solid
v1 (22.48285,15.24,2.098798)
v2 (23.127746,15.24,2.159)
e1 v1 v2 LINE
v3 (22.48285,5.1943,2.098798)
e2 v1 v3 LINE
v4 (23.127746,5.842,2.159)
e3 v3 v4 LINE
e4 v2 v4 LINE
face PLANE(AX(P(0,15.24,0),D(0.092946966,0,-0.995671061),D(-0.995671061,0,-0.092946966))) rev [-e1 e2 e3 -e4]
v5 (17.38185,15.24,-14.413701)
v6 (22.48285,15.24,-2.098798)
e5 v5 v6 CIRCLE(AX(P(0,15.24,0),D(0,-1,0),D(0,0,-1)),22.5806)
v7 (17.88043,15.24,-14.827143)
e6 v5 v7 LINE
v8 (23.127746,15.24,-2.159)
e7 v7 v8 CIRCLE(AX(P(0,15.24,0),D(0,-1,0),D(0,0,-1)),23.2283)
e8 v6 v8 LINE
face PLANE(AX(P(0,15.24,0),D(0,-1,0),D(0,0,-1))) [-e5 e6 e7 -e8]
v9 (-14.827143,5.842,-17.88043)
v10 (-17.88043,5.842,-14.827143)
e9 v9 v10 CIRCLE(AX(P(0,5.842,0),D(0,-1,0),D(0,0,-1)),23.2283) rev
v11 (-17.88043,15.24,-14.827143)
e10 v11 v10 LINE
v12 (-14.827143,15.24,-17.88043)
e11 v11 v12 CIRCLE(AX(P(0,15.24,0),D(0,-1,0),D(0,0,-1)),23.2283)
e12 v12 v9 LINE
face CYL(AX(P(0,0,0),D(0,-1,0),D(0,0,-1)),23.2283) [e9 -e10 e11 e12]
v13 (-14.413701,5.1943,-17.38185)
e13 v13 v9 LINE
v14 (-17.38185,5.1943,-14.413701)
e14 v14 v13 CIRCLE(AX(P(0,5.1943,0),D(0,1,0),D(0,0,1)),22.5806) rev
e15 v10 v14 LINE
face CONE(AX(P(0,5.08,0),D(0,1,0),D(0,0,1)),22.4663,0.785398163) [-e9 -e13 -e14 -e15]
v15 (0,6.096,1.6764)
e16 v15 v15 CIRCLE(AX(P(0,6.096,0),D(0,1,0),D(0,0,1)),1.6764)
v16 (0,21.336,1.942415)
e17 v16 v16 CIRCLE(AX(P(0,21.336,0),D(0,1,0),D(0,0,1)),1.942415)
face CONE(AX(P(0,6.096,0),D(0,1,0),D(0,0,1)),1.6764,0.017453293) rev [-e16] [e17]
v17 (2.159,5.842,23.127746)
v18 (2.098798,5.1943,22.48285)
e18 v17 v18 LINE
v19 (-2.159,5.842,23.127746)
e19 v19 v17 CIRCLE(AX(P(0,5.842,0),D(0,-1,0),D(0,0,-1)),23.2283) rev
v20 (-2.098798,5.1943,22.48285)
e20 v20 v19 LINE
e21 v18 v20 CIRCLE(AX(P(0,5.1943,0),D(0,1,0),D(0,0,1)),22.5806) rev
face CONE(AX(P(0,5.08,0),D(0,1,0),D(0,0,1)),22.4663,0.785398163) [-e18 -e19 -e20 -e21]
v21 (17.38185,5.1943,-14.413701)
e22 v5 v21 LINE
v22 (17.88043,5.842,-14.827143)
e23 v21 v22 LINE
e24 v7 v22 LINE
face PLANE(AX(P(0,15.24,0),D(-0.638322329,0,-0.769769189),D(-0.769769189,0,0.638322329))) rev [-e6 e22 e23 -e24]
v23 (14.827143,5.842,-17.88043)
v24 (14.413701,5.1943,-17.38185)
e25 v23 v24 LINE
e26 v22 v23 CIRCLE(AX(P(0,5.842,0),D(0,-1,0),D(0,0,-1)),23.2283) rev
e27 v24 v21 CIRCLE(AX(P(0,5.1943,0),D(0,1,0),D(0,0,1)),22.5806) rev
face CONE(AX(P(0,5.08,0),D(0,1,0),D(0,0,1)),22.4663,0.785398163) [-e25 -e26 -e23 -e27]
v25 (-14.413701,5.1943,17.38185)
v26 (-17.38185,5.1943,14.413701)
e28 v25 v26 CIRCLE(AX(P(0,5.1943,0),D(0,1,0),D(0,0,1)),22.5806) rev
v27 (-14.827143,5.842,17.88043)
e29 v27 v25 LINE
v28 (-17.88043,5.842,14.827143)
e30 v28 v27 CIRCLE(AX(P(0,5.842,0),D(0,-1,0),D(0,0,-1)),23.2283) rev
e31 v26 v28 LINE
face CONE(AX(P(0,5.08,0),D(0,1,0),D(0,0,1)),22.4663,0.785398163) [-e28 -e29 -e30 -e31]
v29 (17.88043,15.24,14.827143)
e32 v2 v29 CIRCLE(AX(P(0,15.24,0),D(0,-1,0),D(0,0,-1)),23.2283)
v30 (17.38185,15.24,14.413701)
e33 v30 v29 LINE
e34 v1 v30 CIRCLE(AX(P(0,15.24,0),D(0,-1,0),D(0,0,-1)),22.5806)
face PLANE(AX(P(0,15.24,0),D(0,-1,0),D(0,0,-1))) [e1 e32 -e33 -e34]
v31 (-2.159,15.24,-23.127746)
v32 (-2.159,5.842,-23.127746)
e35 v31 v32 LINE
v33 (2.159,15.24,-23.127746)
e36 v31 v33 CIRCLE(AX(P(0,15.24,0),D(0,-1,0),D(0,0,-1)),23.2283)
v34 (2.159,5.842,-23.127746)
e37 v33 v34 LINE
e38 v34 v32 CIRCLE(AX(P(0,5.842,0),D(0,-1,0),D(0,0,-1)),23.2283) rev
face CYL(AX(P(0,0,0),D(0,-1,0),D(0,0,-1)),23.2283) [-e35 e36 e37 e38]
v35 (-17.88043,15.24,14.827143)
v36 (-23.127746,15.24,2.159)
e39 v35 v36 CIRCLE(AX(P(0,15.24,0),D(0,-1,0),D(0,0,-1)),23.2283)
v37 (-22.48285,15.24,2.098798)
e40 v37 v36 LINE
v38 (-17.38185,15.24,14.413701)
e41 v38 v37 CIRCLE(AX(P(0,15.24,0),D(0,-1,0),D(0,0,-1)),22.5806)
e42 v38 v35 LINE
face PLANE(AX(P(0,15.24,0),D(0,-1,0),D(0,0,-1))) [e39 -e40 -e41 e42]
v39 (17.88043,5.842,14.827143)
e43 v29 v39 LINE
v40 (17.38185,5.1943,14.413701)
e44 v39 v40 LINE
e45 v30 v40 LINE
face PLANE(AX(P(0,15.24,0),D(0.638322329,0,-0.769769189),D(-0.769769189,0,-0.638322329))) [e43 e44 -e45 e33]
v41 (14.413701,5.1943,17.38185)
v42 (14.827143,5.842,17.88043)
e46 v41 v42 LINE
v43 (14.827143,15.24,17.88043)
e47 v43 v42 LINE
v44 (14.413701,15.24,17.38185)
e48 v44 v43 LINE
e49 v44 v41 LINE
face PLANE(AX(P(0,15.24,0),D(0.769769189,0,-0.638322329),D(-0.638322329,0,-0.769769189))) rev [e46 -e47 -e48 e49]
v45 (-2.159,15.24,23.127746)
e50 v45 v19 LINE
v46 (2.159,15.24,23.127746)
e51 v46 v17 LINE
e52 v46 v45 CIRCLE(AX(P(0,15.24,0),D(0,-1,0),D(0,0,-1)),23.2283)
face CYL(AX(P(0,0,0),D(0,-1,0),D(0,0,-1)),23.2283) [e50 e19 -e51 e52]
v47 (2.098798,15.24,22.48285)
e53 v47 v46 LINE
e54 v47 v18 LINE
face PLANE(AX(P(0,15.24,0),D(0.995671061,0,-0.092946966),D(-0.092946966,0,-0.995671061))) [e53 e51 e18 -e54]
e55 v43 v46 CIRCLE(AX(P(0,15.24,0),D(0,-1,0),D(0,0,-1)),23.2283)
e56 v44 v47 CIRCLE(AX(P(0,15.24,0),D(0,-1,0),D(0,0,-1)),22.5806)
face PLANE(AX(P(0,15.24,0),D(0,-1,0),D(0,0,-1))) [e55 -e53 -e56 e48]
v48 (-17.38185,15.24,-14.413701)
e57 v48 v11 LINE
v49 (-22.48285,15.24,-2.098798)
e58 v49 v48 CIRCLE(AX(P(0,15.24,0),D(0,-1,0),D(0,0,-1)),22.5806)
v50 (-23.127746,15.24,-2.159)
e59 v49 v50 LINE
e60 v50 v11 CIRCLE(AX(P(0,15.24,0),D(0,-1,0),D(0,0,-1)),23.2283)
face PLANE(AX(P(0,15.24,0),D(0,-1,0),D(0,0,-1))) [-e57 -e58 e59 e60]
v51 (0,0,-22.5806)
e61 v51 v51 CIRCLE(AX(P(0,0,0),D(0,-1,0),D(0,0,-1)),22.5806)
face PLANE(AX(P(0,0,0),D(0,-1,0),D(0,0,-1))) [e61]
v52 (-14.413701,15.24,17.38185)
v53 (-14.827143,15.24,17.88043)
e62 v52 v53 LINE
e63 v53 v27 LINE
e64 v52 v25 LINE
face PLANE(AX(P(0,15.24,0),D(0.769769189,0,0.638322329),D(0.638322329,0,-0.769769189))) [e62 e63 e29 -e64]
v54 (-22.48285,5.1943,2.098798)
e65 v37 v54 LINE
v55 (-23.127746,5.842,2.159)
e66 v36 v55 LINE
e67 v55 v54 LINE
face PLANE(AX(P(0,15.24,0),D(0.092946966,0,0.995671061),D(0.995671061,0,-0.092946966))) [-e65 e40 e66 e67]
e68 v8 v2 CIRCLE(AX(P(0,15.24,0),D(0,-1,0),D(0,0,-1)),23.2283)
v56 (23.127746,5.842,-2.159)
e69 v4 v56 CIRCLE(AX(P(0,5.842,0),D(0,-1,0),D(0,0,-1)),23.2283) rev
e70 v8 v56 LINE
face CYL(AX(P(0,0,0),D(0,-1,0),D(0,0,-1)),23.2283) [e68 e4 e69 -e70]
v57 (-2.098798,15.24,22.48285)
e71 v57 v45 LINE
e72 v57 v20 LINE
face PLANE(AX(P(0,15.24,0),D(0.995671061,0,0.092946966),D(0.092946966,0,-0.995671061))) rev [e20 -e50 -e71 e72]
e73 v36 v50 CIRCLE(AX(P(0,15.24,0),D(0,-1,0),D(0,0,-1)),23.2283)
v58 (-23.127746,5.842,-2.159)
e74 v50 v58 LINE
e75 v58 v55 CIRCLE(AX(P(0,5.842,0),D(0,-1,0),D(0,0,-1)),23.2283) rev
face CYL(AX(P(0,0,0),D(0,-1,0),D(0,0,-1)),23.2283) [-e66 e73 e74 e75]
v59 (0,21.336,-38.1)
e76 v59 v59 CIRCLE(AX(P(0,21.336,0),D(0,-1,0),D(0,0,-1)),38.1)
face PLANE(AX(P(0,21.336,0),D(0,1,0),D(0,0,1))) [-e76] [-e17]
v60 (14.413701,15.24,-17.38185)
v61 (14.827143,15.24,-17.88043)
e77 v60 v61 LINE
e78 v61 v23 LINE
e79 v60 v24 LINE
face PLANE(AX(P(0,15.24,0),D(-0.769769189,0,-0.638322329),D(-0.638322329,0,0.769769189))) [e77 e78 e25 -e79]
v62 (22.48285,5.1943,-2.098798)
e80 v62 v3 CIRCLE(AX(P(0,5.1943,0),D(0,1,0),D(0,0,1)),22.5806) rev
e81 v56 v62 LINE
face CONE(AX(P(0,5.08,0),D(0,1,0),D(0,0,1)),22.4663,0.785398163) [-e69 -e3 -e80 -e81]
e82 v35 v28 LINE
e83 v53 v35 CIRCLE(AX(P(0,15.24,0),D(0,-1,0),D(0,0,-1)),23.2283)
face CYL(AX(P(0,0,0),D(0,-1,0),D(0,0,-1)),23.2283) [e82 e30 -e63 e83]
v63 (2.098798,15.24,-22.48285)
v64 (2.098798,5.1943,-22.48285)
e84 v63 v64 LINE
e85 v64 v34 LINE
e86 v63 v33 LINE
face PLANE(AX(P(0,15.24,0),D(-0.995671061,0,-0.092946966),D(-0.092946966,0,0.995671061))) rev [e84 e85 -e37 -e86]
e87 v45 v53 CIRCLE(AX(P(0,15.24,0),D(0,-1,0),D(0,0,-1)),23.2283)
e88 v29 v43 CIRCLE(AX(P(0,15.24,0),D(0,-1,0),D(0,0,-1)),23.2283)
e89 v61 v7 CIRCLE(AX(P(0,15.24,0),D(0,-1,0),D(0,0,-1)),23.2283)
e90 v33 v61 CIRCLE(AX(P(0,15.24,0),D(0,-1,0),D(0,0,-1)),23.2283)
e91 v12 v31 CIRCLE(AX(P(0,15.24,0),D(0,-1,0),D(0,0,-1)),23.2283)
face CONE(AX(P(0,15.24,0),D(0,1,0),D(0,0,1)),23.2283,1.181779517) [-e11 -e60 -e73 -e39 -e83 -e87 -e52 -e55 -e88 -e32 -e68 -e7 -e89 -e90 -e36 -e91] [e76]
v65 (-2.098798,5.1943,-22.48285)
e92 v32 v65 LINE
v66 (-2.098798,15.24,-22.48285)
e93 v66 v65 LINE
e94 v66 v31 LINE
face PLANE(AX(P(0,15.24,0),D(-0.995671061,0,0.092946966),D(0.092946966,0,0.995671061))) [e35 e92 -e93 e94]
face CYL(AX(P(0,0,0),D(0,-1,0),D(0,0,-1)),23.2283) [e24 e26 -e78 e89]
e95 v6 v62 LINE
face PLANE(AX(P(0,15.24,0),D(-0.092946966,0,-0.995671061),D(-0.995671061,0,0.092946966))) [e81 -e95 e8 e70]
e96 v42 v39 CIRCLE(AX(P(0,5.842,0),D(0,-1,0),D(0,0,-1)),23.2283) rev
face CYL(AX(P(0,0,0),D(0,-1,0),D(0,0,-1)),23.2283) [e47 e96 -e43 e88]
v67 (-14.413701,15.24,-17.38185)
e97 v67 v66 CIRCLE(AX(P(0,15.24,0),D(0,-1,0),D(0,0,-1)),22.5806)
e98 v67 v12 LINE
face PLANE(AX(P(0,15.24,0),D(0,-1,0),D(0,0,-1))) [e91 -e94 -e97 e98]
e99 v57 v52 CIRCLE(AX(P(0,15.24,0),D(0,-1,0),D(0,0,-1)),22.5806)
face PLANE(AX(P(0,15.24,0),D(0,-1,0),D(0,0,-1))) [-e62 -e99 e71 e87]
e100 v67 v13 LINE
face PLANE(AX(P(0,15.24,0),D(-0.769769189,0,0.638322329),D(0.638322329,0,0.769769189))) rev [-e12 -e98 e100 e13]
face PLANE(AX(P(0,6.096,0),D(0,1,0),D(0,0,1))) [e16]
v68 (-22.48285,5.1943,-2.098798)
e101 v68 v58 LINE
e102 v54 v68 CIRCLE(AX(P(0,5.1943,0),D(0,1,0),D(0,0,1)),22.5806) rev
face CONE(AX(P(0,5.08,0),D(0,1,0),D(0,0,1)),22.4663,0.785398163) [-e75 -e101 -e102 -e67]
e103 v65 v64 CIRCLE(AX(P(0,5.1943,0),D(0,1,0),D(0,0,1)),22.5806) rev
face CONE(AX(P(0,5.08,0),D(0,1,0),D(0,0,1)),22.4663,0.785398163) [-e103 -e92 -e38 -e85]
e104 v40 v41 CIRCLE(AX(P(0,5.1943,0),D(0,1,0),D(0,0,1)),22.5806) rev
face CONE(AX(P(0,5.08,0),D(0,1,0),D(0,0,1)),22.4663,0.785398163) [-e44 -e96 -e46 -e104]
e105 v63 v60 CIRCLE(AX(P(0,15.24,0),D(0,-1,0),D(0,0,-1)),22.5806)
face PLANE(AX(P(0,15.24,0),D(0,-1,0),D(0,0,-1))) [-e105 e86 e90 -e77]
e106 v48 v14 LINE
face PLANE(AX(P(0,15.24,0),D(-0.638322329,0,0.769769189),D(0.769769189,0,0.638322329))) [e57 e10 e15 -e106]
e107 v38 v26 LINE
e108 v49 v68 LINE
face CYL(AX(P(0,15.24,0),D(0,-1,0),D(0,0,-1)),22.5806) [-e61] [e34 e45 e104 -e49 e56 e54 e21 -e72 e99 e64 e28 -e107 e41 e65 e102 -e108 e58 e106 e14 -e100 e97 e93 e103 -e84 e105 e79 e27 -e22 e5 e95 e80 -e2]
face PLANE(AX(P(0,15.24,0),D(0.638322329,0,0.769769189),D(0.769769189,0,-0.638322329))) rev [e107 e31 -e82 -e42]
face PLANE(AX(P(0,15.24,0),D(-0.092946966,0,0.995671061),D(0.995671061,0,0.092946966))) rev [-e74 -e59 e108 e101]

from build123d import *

# Parameters (mm, degrees)
SKETCH1_W          = 23.2283
SKETCH1_H          = 15.24
CUT_EXTRUDE1_START = -15.24
CUT_EXTRUDE1_DEPTH = 15.24
SKETCH3_R          = 1.6764
CUT_EXTRUDE2_DEPTH = 15.24
CUT_EXTRUDE3_START = -5.08
SKETCH4_R          = 23.2283
SKETCH4_R_2        = 22.5806
CUT_EXTRUDE3_DEPTH = 5.08
CHAMFER1_SIZE      = 0.762
DRAFT1_ANGLE       = 1


with BuildPart() as part:
    # Sketch1 → Revolve1 (revolve)
    with BuildSketch(Plane.XY, mode=Mode.PRIVATE) as revolve1_sk:
        with Locations((11.61415, 7.62)):
            Rectangle(SKETCH1_W, SKETCH1_H)
        Polygon((0, 21.336), (0, 15.24), (23.2283, 15.24), (38.1, 21.336), align=None)
    revolve(revolve1_sk.sketch.rotate(Axis((0, 0, 0), (0, 1, 0)), 90), axis=Axis((0, 0, 0), (0, 1, 0)))

    # Sketch2 → Cut-Extrude1 (cut)
    with BuildSketch(Plane.XZ.offset(CUT_EXTRUDE1_START)):
        with BuildLine():
            Line((2.159, 23.127746105), (2.09879825, 22.482849959))
            ThreePointArc((2.09879825, 22.482849959), (8.641221513, 20.861754172), (14.413701191, 17.381850141))
            Line((14.413701191, 17.381850141), (14.827142564, 17.880429645))
            ThreePointArc((14.827142564, 17.880429645), (8.889085572, 21.460150945), (2.159, 23.127746105))
        make_face()
        with BuildLine():
            ThreePointArc((-14.413701191, 17.381850141), (-8.641221513, 20.861754172), (-2.09879825, 22.482849959))
            Line((-2.09879825, 22.482849959), (-2.159, 23.127746105))
            ThreePointArc((-2.159, 23.127746105), (-8.889085572, 21.460150945), (-14.827142564, 17.880429645))
            Line((-14.827142564, 17.880429645), (-14.413701191, 17.381850141))
        make_face()
        with BuildLine():
            Line((-23.127746105, 2.159), (-22.482849959, 2.09879825))
            ThreePointArc((-22.482849959, 2.09879825), (-20.861754172, 8.641221513), (-17.381850141, 14.413701191))
            Line((-17.381850141, 14.413701191), (-17.880429645, 14.827142564))
            ThreePointArc((-17.880429645, 14.827142564), (-21.460150945, 8.889085572), (-23.127746105, 2.159))
        make_face()
        with BuildLine():
            Line((-17.880429645, -14.827142564), (-17.381850141, -14.413701191))
            ThreePointArc((-17.381850141, -14.413701191), (-20.861754172, -8.641221513), (-22.482849959, -2.09879825))
            Line((-22.482849959, -2.09879825), (-23.127746105, -2.159))
            ThreePointArc((-23.127746105, -2.159), (-21.460150945, -8.889085572), (-17.880429645, -14.827142564))
        make_face()
        with BuildLine():
            Line((-2.159, -23.127746105), (-2.09879825, -22.482849959))
            ThreePointArc((-2.09879825, -22.482849959), (-8.641221513, -20.861754172), (-14.413701191, -17.381850141))
            Line((-14.413701191, -17.381850141), (-14.827142564, -17.880429645))
            ThreePointArc((-14.827142564, -17.880429645), (-8.889085572, -21.460150945), (-2.159, -23.127746105))
        make_face()
        with BuildLine():
            Line((14.827142564, -17.880429645), (14.413701191, -17.381850141))
            ThreePointArc((14.413701191, -17.381850141), (8.641221513, -20.861754172), (2.09879825, -22.482849959))
            Line((2.09879825, -22.482849959), (2.159, -23.127746105))
            ThreePointArc((2.159, -23.127746105), (8.889085572, -21.460150945), (14.827142564, -17.880429645))
        make_face()
        with BuildLine():
            Line((23.127746105, -2.159), (22.482849959, -2.09879825))
            ThreePointArc((22.482849959, -2.09879825), (20.861754172, -8.641221513), (17.381850141, -14.413701191))
            Line((17.381850141, -14.413701191), (17.880429645, -14.827142564))
            ThreePointArc((17.880429645, -14.827142564), (21.460150945, -8.889085572), (23.127746105, -2.159))
        make_face()
        with BuildLine():
            Line((17.880429645, 14.827142564), (17.381850141, 14.413701191))
            ThreePointArc((17.381850141, 14.413701191), (20.861754172, 8.641221513), (22.482849959, 2.09879825))
            Line((22.482849959, 2.09879825), (23.127746105, 2.159))
            ThreePointArc((23.127746105, 2.159), (21.460150945, 8.889085572), (17.880429645, 14.827142564))
        make_face()
    extrude(amount=CUT_EXTRUDE1_DEPTH, mode=Mode.SUBTRACT)

    # Sketch3 → Cut-Extrude2 (cut)
    with BuildSketch(Plane(origin=(0, 21.336, 0), x_dir=(1, 0, 0), z_dir=(0, 1, 0))):
        with Locations(Location((0, 0, 0), (0, 0, 270))):
            Circle(SKETCH3_R)
    extrude(amount=-CUT_EXTRUDE2_DEPTH, mode=Mode.SUBTRACT)

    # Sketch4 → Cut-Extrude3 (cut)
    with BuildSketch(Plane.XZ.offset(CUT_EXTRUDE3_START)):
        Circle(SKETCH4_R)
        with Locations(Location((0, 0, 0), (0, 0, 270))):
            Circle(SKETCH4_R_2, mode=Mode.SUBTRACT)
    extrude(amount=CUT_EXTRUDE3_DEPTH, mode=Mode.SUBTRACT)

    # Chamfer1
    # the kernel refuses this chamfer: 0.762 mm, written as the material it takes off along each edge
    with BuildSketch(Plane(origin=(0, 5.08, 0), x_dir=(-0.17651563537313197, 0, -0.9842978362613723), z_dir=(-0.9842978362613723, 0, 0.17651563537313197))) as chamfer1_piece_1_section:
        Polygon((23.2283 - CHAMFER1_SIZE, 0), (23.2283, -CHAMFER1_SIZE), (23.2283, 0), align=None)
    chamfer1_piece_1 = revolve(axis=Axis((0, 5.08, 0), (0, -1, 0)), revolution_arc=20.333741592, mode=Mode.PRIVATE)
    chamfer1_piece_1 = chamfer1_piece_1 - Plane(origin=(0, 5.340057495, 0), x_dir=(0, 0, -1), z_dir=(0, 1, 0)) * Cylinder(22.5806, 93, mode=Mode.PRIVATE)
    add(chamfer1_piece_1, mode=Mode.SUBTRACT)
    with BuildSketch(Plane(origin=(0, 5.08, 0), x_dir=(0.5711882719698622, 0, -0.8208190774854607), z_dir=(-0.8208190774854607, 0, -0.5711882719698622))) as chamfer1_piece_2_section:
        Polygon((23.2283, -CHAMFER1_SIZE), (23.2283 - CHAMFER1_SIZE, 0), (23.2283, 0), align=None)
    chamfer1_piece_2 = revolve(axis=Axis((0, 5.08, 0), (0, -1, 0)), revolution_arc=20.333741592, mode=Mode.PRIVATE)
    chamfer1_piece_2 = chamfer1_piece_2 - Plane(origin=(0, 5.340057495, 0), x_dir=(0, 0, -1), z_dir=(0, 1, 0)) * Cylinder(22.5806, 93, mode=Mode.PRIVATE)
    add(chamfer1_piece_2, mode=Mode.SUBTRACT)
    with BuildSketch(Plane(origin=(0, 5.08, 0), x_dir=(0.9842978362613659, 0, -0.17651563537316883), z_dir=(-0.17651563537316883, 0, -0.9842978362613659))) as chamfer1_piece_3_section:
        Polygon((23.2283 - CHAMFER1_SIZE, 0), (23.2283, -CHAMFER1_SIZE), (23.2283, 0), align=None)
    chamfer1_piece_3 = revolve(axis=Axis((0, 5.08, 0), (0, -1, 0)), revolution_arc=20.333741592, mode=Mode.PRIVATE)
    chamfer1_piece_3 = chamfer1_piece_3 - Plane(origin=(0, 5.340057495, 0), x_dir=(0, 0, -1), z_dir=(0, 1, 0)) * Cylinder(22.5806, 93, mode=Mode.PRIVATE)
    add(chamfer1_piece_3, mode=Mode.SUBTRACT)
    with BuildSketch(Plane(origin=(0, 5.08, 0), x_dir=(0.8208190774854608, 0, 0.5711882719698618), z_dir=(0.5711882719698618, 0, -0.8208190774854608))) as chamfer1_piece_4_section:
        Polygon((23.2283 - CHAMFER1_SIZE, 0), (23.2283, -CHAMFER1_SIZE), (23.2283, 0), align=None)
    chamfer1_piece_4 = revolve(axis=Axis((0, 5.08, 0), (0, -1, 0)), revolution_arc=20.333741592, mode=Mode.PRIVATE)
    chamfer1_piece_4 = chamfer1_piece_4 - Plane(origin=(0, 5.340057495, 0), x_dir=(0, 0, -1), z_dir=(0, 1, 0)) * Cylinder(22.5806, 93, mode=Mode.PRIVATE)
    add(chamfer1_piece_4, mode=Mode.SUBTRACT)
    with BuildSketch(Plane(origin=(0, 5.08, 0), x_dir=(0.1765156353731264, 0, 0.9842978362613735), z_dir=(0.9842978362613735, 0, -0.1765156353731264))) as chamfer1_piece_5_section:
        Polygon((23.2283 - CHAMFER1_SIZE, 0), (23.2283, -CHAMFER1_SIZE), (23.2283, 0), align=None)
    chamfer1_piece_5 = revolve(axis=Axis((0, 5.08, 0), (0, -1, 0)), revolution_arc=20.333741592, mode=Mode.PRIVATE)
    chamfer1_piece_5 = chamfer1_piece_5 - Plane(origin=(0, 5.340057495, 0), x_dir=(0, 0, -1), z_dir=(0, 1, 0)) * Cylinder(22.5806, 93, mode=Mode.PRIVATE)
    add(chamfer1_piece_5, mode=Mode.SUBTRACT)
    with BuildSketch(Plane(origin=(0, 5.08, 0), x_dir=(-0.5711882719698653, 0, 0.8208190774854587), z_dir=(0.8208190774854587, 0, 0.5711882719698653))) as chamfer1_piece_6_section:
        Polygon((23.2283 - CHAMFER1_SIZE, 0), (23.2283, -CHAMFER1_SIZE), (23.2283, 0), align=None)
    chamfer1_piece_6 = revolve(axis=Axis((0, 5.08, 0), (0, -1, 0)), revolution_arc=20.333741592, mode=Mode.PRIVATE)
    chamfer1_piece_6 = chamfer1_piece_6 - Plane(origin=(0, 5.340057495, 0), x_dir=(0, 0, -1), z_dir=(0, 1, 0)) * Cylinder(22.5806, 93, mode=Mode.PRIVATE)
    add(chamfer1_piece_6, mode=Mode.SUBTRACT)
    with BuildSketch(Plane(origin=(0, 5.08, 0), x_dir=(-0.9842978362613705, 0, 0.17651563537314238), z_dir=(0.17651563537314238, 0, 0.9842978362613705))) as chamfer1_piece_7_section:
        Polygon((23.2283 - CHAMFER1_SIZE, 0), (23.2283, -CHAMFER1_SIZE), (23.2283, 0), align=None)
    chamfer1_piece_7 = revolve(axis=Axis((0, 5.08, 0), (0, -1, 0)), revolution_arc=20.333741592, mode=Mode.PRIVATE)
    chamfer1_piece_7 = chamfer1_piece_7 - Plane(origin=(0, 5.340057495, 0), x_dir=(0, 0, -1), z_dir=(0, 1, 0)) * Cylinder(22.5806, 93, mode=Mode.PRIVATE)
    add(chamfer1_piece_7, mode=Mode.SUBTRACT)
    with BuildSketch(Plane(origin=(0, 5.08, 0), x_dir=(-0.8208190774854607, 0, -0.5711882719698622), z_dir=(-0.5711882719698622, 0, 0.8208190774854607))) as chamfer1_piece_8_section:
        Polygon((23.2283 - CHAMFER1_SIZE, 0), (23.2283, -CHAMFER1_SIZE), (23.2283, 0), align=None)
    chamfer1_piece_8 = revolve(axis=Axis((0, 5.08, 0), (0, -1, 0)), revolution_arc=20.333741592, mode=Mode.PRIVATE)
    chamfer1_piece_8 = chamfer1_piece_8 - Plane(origin=(0, 5.340057495, 0), x_dir=(0, 0, -1), z_dir=(0, 1, 0)) * Cylinder(22.5806, 93, mode=Mode.PRIVATE)
    add(chamfer1_piece_8, mode=Mode.SUBTRACT)

    # Draft1
    draft1_faces = [part.faces().sort_by_distance(p)[0] for p in [
        (0, 13.716, -1.6764),
    ]]
    draft(draft1_faces, Plane.ZX.offset(6.096), DRAFT1_ANGLE)


solid = part.part
